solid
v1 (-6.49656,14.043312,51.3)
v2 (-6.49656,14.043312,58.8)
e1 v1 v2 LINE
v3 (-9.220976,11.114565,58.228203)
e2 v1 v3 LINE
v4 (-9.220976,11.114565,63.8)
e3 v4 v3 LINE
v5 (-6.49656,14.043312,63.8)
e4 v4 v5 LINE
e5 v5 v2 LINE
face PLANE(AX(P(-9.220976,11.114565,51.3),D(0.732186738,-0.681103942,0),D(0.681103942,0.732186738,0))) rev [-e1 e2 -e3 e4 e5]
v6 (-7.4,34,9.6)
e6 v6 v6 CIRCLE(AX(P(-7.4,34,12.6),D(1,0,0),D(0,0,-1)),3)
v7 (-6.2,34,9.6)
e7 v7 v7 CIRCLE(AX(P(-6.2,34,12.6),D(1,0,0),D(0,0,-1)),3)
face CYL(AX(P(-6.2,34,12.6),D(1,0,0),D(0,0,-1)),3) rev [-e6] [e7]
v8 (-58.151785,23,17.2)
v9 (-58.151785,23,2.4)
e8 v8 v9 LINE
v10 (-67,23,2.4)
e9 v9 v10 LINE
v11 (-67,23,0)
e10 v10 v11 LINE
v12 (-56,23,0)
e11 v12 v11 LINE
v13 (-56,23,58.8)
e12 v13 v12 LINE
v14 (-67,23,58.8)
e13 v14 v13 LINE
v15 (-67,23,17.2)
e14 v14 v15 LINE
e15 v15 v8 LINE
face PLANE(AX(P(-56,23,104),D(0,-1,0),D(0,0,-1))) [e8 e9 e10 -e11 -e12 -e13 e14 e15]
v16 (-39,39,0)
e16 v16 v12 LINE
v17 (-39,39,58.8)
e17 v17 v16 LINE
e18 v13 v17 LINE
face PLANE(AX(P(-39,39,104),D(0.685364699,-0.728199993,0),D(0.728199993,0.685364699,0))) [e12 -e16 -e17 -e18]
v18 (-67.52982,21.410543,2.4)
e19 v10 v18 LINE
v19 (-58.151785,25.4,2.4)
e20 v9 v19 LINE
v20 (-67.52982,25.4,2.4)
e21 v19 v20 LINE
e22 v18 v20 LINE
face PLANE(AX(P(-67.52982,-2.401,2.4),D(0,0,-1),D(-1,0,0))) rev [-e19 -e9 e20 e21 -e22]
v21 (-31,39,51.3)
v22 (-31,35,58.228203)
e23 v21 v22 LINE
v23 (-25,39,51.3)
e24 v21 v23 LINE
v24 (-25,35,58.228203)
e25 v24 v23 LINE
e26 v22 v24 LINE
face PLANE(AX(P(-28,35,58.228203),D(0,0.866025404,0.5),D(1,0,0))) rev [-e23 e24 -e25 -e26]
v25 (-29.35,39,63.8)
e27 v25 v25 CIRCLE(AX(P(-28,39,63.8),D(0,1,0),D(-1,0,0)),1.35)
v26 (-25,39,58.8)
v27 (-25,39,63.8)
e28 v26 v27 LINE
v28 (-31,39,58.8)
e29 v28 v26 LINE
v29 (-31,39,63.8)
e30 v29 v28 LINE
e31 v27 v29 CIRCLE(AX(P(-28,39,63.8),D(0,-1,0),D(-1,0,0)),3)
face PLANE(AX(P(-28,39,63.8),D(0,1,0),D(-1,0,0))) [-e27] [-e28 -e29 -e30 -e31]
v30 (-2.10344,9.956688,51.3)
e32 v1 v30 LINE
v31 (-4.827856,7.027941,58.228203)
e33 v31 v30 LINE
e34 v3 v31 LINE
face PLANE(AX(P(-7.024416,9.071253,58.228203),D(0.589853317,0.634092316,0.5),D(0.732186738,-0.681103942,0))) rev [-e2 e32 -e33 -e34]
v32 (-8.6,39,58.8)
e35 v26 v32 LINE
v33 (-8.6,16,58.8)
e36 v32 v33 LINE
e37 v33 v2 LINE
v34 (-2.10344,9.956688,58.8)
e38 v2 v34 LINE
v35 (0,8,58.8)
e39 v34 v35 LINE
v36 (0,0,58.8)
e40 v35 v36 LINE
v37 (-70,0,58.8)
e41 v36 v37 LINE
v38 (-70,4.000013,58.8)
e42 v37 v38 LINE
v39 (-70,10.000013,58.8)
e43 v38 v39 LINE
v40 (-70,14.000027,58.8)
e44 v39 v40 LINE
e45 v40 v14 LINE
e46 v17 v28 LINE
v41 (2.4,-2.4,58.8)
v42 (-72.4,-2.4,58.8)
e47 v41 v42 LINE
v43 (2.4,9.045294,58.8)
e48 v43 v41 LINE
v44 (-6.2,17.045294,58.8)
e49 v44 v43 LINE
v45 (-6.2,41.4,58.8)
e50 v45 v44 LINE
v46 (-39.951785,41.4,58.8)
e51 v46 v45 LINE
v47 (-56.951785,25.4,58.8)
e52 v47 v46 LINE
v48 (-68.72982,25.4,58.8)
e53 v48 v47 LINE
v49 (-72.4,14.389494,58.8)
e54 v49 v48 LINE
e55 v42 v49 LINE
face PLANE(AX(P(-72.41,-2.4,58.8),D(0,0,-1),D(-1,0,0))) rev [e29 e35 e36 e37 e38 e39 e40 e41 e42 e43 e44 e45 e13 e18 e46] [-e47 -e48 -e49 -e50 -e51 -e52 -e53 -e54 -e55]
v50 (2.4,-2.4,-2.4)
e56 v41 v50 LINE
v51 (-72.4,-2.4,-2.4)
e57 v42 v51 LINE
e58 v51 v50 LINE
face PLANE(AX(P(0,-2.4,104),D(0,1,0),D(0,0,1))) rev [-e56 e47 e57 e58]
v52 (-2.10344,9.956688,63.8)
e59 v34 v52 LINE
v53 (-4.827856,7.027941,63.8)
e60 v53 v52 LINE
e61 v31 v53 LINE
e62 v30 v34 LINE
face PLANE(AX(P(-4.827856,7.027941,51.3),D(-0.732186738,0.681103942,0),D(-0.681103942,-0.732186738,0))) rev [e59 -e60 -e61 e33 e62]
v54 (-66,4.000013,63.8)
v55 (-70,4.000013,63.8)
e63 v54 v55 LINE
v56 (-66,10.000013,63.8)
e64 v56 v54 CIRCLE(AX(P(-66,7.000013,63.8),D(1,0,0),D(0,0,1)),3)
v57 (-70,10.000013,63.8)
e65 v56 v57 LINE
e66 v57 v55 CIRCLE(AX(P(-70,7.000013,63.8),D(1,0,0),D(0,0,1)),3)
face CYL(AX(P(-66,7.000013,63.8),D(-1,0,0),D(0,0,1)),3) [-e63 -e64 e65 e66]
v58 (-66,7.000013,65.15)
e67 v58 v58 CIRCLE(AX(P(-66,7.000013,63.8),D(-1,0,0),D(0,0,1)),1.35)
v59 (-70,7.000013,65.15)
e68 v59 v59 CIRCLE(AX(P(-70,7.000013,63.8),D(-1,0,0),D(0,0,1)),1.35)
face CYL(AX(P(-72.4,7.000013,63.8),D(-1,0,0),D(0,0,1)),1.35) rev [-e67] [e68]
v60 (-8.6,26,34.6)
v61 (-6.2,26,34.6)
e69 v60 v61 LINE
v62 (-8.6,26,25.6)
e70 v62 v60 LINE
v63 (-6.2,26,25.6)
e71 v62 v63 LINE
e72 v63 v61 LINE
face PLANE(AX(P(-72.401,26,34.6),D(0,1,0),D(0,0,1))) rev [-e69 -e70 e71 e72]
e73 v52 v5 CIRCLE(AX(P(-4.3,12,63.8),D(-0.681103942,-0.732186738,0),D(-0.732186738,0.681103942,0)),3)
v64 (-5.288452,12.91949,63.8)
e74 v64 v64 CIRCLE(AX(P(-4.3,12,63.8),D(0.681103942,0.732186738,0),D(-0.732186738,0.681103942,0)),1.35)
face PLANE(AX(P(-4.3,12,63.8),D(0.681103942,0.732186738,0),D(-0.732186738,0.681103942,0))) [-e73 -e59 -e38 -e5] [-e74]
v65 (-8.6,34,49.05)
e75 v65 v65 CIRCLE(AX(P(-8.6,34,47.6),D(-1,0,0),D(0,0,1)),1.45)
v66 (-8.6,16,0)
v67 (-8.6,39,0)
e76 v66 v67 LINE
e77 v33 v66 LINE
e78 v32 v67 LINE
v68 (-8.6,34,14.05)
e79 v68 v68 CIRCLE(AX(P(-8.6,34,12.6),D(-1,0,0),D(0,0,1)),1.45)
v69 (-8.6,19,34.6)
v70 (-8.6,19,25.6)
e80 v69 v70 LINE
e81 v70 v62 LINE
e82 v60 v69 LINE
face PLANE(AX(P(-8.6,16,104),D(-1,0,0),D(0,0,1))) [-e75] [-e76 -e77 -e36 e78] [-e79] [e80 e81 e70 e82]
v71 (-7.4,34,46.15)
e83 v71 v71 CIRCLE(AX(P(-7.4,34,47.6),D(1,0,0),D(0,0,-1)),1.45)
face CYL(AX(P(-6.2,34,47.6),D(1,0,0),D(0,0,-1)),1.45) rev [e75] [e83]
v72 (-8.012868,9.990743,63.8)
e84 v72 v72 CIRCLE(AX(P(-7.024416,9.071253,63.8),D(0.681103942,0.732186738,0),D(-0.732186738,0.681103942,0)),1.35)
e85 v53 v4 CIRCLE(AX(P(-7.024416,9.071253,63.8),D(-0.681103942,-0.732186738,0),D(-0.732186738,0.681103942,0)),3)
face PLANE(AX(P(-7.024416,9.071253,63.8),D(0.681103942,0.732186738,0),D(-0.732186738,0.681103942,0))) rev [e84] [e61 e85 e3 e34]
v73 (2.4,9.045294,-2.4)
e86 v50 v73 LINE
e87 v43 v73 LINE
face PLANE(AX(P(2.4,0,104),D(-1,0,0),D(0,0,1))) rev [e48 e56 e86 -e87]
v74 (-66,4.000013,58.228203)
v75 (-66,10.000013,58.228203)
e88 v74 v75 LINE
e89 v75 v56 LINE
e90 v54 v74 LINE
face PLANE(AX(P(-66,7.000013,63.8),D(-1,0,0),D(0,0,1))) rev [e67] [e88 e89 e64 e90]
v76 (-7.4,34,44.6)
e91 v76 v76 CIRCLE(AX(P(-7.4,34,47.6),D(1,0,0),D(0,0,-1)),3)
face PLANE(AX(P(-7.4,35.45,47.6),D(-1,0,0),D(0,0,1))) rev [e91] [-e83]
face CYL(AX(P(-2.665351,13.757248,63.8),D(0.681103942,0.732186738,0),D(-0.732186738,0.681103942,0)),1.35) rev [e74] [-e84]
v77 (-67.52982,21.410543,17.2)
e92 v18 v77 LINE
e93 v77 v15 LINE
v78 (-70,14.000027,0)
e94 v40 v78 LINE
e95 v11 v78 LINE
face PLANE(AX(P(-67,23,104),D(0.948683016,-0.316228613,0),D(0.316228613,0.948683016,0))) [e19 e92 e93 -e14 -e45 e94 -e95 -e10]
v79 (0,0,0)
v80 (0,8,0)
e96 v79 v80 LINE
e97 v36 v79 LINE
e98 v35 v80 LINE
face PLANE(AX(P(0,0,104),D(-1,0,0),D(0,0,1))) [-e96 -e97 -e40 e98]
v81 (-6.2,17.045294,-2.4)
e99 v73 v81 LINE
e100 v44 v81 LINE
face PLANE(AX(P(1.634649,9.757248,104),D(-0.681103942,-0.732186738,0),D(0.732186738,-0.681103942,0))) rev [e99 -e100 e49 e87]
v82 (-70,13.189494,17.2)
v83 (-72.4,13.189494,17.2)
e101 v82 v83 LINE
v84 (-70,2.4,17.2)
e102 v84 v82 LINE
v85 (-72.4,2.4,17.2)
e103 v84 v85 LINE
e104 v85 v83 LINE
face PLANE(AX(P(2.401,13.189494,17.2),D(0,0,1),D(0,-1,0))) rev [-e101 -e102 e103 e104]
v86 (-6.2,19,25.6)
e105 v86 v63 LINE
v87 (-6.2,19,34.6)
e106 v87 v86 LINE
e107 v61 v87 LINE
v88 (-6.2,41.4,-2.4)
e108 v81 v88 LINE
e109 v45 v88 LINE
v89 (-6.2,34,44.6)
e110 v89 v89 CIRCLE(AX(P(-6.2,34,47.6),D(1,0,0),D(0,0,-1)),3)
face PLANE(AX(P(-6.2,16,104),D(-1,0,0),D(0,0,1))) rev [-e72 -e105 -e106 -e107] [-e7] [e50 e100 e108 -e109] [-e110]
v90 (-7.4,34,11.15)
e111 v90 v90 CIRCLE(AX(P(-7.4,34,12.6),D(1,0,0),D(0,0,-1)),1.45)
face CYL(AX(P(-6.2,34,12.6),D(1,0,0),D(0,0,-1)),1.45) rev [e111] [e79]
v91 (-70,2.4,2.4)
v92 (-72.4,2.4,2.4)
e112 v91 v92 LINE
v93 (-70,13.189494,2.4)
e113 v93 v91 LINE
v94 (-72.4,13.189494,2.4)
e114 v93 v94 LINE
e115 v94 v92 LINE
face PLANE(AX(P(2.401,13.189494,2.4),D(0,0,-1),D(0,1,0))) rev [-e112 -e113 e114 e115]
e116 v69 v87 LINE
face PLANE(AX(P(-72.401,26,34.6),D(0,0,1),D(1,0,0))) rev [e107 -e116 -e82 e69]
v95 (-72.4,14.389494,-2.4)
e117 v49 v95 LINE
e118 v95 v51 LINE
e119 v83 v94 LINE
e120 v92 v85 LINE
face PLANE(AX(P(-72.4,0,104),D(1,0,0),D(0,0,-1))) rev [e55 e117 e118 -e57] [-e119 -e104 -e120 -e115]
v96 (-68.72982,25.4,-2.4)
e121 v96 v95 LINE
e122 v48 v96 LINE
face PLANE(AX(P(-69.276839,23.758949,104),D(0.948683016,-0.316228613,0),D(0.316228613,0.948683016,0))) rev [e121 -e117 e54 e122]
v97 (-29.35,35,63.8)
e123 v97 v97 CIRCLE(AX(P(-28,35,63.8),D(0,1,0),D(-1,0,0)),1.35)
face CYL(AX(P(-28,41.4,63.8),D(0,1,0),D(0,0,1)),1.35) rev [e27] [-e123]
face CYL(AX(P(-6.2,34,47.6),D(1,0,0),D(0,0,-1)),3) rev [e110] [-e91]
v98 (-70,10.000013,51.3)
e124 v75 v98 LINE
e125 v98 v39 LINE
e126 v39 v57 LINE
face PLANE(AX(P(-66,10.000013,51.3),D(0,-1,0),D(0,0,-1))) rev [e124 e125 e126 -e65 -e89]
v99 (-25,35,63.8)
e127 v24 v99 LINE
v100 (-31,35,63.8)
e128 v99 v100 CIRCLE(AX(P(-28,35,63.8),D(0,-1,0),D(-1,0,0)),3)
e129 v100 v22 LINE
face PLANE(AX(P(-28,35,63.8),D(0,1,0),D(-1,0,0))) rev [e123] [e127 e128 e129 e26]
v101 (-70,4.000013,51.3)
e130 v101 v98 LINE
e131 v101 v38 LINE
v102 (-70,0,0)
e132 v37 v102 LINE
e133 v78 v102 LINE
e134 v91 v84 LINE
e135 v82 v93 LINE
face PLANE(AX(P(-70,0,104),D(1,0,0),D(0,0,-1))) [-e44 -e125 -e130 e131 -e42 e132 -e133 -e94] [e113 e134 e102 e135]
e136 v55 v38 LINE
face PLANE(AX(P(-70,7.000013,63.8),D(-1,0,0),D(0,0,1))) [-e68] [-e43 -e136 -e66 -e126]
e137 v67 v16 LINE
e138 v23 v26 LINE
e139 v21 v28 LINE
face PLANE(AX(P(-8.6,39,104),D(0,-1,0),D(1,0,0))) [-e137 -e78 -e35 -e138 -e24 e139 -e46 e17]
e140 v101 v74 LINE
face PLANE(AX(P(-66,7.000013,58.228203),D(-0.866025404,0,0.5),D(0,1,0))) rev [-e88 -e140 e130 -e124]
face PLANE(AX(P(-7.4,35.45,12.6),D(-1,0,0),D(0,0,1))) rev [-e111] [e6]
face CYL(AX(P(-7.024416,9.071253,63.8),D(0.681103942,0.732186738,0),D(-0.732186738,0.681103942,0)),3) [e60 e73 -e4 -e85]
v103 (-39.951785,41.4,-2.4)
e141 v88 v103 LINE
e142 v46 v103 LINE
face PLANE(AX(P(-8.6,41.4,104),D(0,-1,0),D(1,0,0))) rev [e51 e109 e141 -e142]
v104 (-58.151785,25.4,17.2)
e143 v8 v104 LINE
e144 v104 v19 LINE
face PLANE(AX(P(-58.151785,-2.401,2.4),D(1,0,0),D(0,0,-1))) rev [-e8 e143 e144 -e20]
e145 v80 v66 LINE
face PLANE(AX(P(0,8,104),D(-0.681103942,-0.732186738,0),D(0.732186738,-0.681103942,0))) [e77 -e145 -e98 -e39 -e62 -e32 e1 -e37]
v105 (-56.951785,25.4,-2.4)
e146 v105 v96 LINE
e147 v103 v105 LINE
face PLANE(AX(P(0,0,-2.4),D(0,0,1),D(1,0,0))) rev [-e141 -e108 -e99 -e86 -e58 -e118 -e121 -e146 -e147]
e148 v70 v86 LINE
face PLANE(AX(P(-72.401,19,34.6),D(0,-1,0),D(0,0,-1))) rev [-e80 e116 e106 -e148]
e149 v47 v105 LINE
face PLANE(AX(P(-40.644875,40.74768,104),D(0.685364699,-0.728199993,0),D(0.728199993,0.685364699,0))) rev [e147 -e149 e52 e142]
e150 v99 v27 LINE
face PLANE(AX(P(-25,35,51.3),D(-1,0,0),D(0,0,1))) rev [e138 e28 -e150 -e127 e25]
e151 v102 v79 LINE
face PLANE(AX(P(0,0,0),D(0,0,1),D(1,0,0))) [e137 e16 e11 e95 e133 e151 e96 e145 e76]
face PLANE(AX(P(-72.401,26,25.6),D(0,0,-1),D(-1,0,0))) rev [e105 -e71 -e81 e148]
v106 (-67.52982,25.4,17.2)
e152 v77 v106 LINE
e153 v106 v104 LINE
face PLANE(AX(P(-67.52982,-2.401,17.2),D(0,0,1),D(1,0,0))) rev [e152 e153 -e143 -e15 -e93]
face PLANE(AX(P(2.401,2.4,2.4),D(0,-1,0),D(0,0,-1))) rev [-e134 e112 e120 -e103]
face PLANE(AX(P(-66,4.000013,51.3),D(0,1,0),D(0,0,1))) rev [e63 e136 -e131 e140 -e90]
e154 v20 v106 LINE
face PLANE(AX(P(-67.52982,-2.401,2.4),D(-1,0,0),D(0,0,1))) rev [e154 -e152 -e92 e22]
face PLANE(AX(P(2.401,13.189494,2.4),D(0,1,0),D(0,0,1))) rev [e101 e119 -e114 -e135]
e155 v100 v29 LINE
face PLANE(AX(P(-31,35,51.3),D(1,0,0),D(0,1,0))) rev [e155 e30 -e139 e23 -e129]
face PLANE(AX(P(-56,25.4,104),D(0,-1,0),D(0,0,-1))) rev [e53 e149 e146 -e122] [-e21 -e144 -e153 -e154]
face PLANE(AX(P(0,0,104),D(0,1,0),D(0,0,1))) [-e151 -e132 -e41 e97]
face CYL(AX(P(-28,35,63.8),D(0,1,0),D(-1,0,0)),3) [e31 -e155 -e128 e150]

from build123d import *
from OCP.BRepFilletAPI import BRepFilletAPI_MakeChamfer

# Parameters (mm, degrees)
BOSS_EXTRUDE1_DEPTH                                = 104
SHELL1_START                                       = -8.6
SHELL1_OUTLINE_W                                   = 16
SHELL1_OUTLINE_H                                   = 108.8
SHELL1_DEPTH                                       = 2.4
SHELL1_START_2                                     = -56.951785259
SHELL1_2_OUTLINE_W                                 = 43.8
SHELL1_2_OUTLINE_H                                 = 108.8
SHELL1_2_DEPTH                                     = 50.751785259
SHELL1_START_3                                     = -72.4
SHELL1_3_OUTLINE_W                                 = 27.8
SHELL1_3_OUTLINE_H                                 = 108.8
SHELL1_3_DEPTH                                     = 74.8
SHELL1_4_DEPTH                                     = 104
SHELL1_START_4                                     = -2.4
SHELL1_5_DEPTH                                     = 108.8
SPLIT1_SURFACE_1_BACK                              = 140.108
SPLIT1_SURFACE_1_DEPTH                             = 280.216
SPLIT1_SURFACE_2_BACK                              = 140.108
SPLIT1_SURFACE_2_DEPTH                             = 280.216
BOSS_EXTRUDE2_DEPTH                                = 4
BOSS_EXTRUDE3_DEPTH                                = 4
BOSS_EXTRUDE4_DEPTH                                = 4
CHAMFER1_SIZE                                      = 4
CHAMFER1_SIZE_2                                    = 6.92820323
CBORE_START                                        = 6.157493905
CBORE_FOR_M2_5_PAN_HEAD_MACHINE_SCRE_2_R           = 3
CBORE_FOR_M2_5_PAN_HEAD_MACHINE_SCREW1_4_DEPTH     = 2.1
CBORE_START_2                                      = 5.857493905
CBORE_FOR_M2_5_PAN_HEAD_MACHINE_SCRE_3_R           = 1.35
CBORE_FOR_M2_5_PAN_HEAD_MACHINE_SCREW1_5_DEPTH     = 0.3
CBORE_START_3                                      = 39.3
CBORE_FOR_M2_5_PAN_HEAD_MACHINE_SCRE_4_R           = 3
CBORE_FOR_M2_5_PAN_HEAD_MACHINE_SCREW1_6_DEPTH     = 2.1
CBORE_START_4                                      = 38
CBORE_FOR_M2_5_PAN_HEAD_MACHINE_SCRE_5_R           = 1.35
CBORE_FOR_M2_5_PAN_HEAD_MACHINE_SCREW1_7_DEPTH     = 1.3
CBORE_START_5                                      = -72.4
CBORE_FOR_M2_5_PAN_HEAD_MACHINE_SCRE_6_R           = 3
CBORE_FOR_M2_5_PAN_HEAD_MACHINE_SCREW1_8_DEPTH     = 2.1
CBORE_START_6                                      = -70.3
CBORE_FOR_M2_5_PAN_HEAD_MACHINE_SCRE_7_R           = 1.35
CBORE_FOR_M2_5_PAN_HEAD_MACHINE_SCREW1_9_DEPTH     = 0.3
CUT_EXTRUDE1_REACH                                 = 104.356
SKETCH12_W                                         = 9.37803524
SKETCH12_H                                         = 14.8
CUT_EXTRUDE2_REACH                                 = 110.495
SKETCH13_W                                         = 14.8
SKETCH13_H                                         = 10.789494281
CUT_EXTRUDE3_REACH                                 = 104.755
SKETCH14_W                                         = 9
SKETCH14_H                                         = 7
CBORE_FOR_M2_5_PAN_HEAD_MACHINE_SCREW2_D           = 2.9
CBORE_FOR_M2_5_PAN_HEAD_MACHINE_SCREW2_DEPTH       = 10
CBORE_FOR_M2_5_PAN_HEAD_MACHINE_SCREW2_CBORE_D     = 6
CBORE_FOR_M2_5_PAN_HEAD_MACHINE_SCREW2_CBORE_DEPTH = 1.2


with BuildPart() as part:
    # Sketch1 → Boss-Extrude1 (new body)
    with BuildSketch(Plane.XY):
        Polygon((-39, 39), (-56, 23), (-67, 23), (-70, 14.000026796), (-70, 0), (0, 0), (0, 8), (-8.6, 16), (-8.6, 39), align=None)
    extrude(amount=BOSS_EXTRUDE1_DEPTH)

    # Shell1: read off the stored shape, not the designer's step
    # Shell1 outline → Shell1 (add)
    with BuildSketch(Plane.YZ.offset(SHELL1_START)):
        with Locations((33.4, 52)):
            Rectangle(SHELL1_OUTLINE_W, SHELL1_OUTLINE_H)
    extrude(amount=SHELL1_DEPTH)

    # Shell1 2 outline → Shell1 2 (add)
    with BuildSketch(Plane.YZ.offset(SHELL1_START_2)):
        with Locations((19.5, 52)):
            Rectangle(SHELL1_2_OUTLINE_W, SHELL1_2_OUTLINE_H)
    extrude(amount=SHELL1_2_DEPTH)

    # Shell1 3 outline → Shell1 3 (add)
    with BuildSketch(Plane.YZ.offset(SHELL1_START_3)):
        with Locations((11.5, 52)):
            Rectangle(SHELL1_3_OUTLINE_W, SHELL1_3_OUTLINE_H)
    extrude(amount=SHELL1_3_DEPTH)

    # Shell1 4 outline → Shell1 4 (cut)
    with BuildSketch(Plane.XY):
        Polygon((-6.2, 25.4), (-6.2, 17.045294183), (2.4, 9.045294183), (2.4, 25.4), align=None)
        Polygon((-72.4, 14.389494281), (-68.729820499, 25.4), (-72.4, 25.4), align=None)
        Polygon((-56.951785259, 25.4), (-39.951785259, 41.4), (-56.951785259, 41.4), align=None)
        Polygon((0, 0), (0, 8), (-8.6, 16), (-8.6, 39), (-39, 39), (-56, 23), (-67, 23), (-70, 14.000026796), (-70, 0), align=None)
    extrude(amount=SHELL1_4_DEPTH, mode=Mode.SUBTRACT)

    # Shell1 5 outline → Shell1 5 (cut)
    with BuildSketch(Plane.XY.offset(SHELL1_START_4)):
        Polygon((-6.2, 25.4), (-6.2, 17.045294183), (2.4, 9.045294183), (2.4, 25.4), align=None)
        Polygon((-72.4, 14.389494281), (-68.729820499, 25.4), (-72.4, 25.4), align=None)
        Polygon((-56.951785259, 25.4), (-39.951785259, 41.4), (-56.951785259, 41.4), align=None)
    extrude(amount=SHELL1_5_DEPTH, mode=Mode.SUBTRACT)


with BuildPart() as body_2:
    # Split1: the piece behind the surface
    add(part.part)
    # Split1 surface: a surface, the sketch's curves swept straight by 280.216 mm
    with BuildLine(Plane(origin=(0, 0, 0), x_dir=(0, 0, -1), z_dir=(1, 0, 0)).offset(-SPLIT1_SURFACE_1_BACK), mode=Mode.PRIVATE) as split1_surface_1_path:
        Line((-58.8, -2.4), (-58.8, 41.4))
    split1_surface_1 = Shell.extrude(split1_surface_1_path.wire(), (1 * SPLIT1_SURFACE_1_DEPTH, 0 * SPLIT1_SURFACE_1_DEPTH, 0 * SPLIT1_SURFACE_1_DEPTH))
    split(bisect_by=split1_surface_1, keep=Keep.BOTTOM)

    # Sketch3 → Boss-Extrude2 (add)
    with BuildSketch(Plane(origin=(3.989562192, 4.288779356, 0), x_dir=(0.7321867381630838, -0.6811039424772873, 0), z_dir=(-0.6811039424772873, -0.7321867381630838, 0))):
        with BuildLine():
            Line((-14.321650284, 51.3), (-8.321650284, 51.3))
            Line((-8.321650284, 51.3), (-8.321650284, 63.8))
            ThreePointArc((-8.321650284, 63.8), (-11.321650284, 66.8), (-14.321650284, 63.8))
            Line((-14.321650284, 63.8), (-14.321650284, 51.3))
        make_face()
    extrude(amount=BOSS_EXTRUDE2_DEPTH)

    # Sketch4 → Boss-Extrude3 (add)
    with BuildSketch(Plane.XZ.offset(-39)):
        with BuildLine():
            Line((-31, 51.3), (-25, 51.3))
            Line((-25, 51.3), (-25, 63.8))
            ThreePointArc((-25, 63.8), (-28, 66.8), (-31, 63.8))
            Line((-31, 63.8), (-31, 51.3))
        make_face()
    extrude(amount=BOSS_EXTRUDE3_DEPTH)

    # Sketch5 → Boss-Extrude4 (add)
    with BuildSketch(Plane(origin=(-70, 0, 0), x_dir=(0, 0, -1), z_dir=(1, 0, 0))):
        with BuildLine():
            Line((-51.3, 10.000013398), (-63.8, 10.000013398))
            ThreePointArc((-63.8, 10.000013398), (-66.8, 7.000013398), (-63.8, 4.000013398))
            Line((-63.8, 4.000013398), (-51.3, 4.000013398))
            Line((-51.3, 4.000013398), (-51.3, 10.000013398))
        make_face()
    extrude(amount=BOSS_EXTRUDE4_DEPTH)

    # Chamfer1
    chamfer1_edges_1 = [body_2.edges().sort_by_distance(p)[0] for p in [
        (-7.02441577, 9.071253047, 51.3),
    ]]
    chamfer1_side_1 = [body_2.faces().sort_by_distance(p)[0] for p in [
        (-6.969927455, 9.129827986, 51.3),
    ]]
    chamfer1_edges_2 = [body_2.edges().sort_by_distance(p)[0] for p in [
        (-28, 35, 51.3),
    ]]
    chamfer1_side_2 = [body_2.faces().sort_by_distance(p)[0] for p in [
        (-28, 35.08, 51.3),
    ]]
    chamfer1_edges_3 = [body_2.edges().sort_by_distance(p)[0] for p in [
        (-66, 7.000013398, 51.3),
    ]]
    chamfer1_side_3 = [body_2.faces().sort_by_distance(p)[0] for p in [
        (-66.08, 7.000013398, 51.3),
    ]]
    chamfer1 = BRepFilletAPI_MakeChamfer(body_2.part.solid().wrapped)
    for e in chamfer1_edges_1:
        chamfer1.Add(CHAMFER1_SIZE - 0.0001, CHAMFER1_SIZE_2 - 0.0001, e.wrapped, chamfer1_side_1[0].wrapped)
    for e in chamfer1_edges_2:
        chamfer1.Add(CHAMFER1_SIZE - 0.0001, CHAMFER1_SIZE_2 - 0.0001, e.wrapped, chamfer1_side_2[0].wrapped)
    for e in chamfer1_edges_3:
        chamfer1.Add(CHAMFER1_SIZE - 0.0001, CHAMFER1_SIZE_2 - 0.0001, e.wrapped, chamfer1_side_3[0].wrapped)
    add(Compound.cast(chamfer1.Shape()), mode=Mode.REPLACE)  # a hair under: the kernel refuses the full size

    # CBORE for M2.5 Pan Head Machine Screw1: read off the stored shape, not the designer's step
    # CBORE for M2.5 Pan Head Machine Screw1: loft between two sections, ruled curve by curve
    cbore_for_m2_5_pan_head_machine_screw1_from = [
        Edge.make_three_point_arc((-8.012867866, 9.99074337, 63.8), (-7.02441577, 9.071253047, 65.15), (-6.035963673, 8.151762725, 63.8)),
        Edge.make_three_point_arc((-6.035963673, 8.151762725, 63.8), (-7.02441577, 9.071253047, 62.45), (-8.012867866, 9.99074337, 63.8)),
    ]
    cbore_for_m2_5_pan_head_machine_screw1_to = [
        Edge.make_three_point_arc((-5.288452097, 12.919490322, 63.8), (-4.3, 12, 65.15), (-3.311547903, 11.080509678, 63.8)),
        Edge.make_three_point_arc((-3.311547903, 11.080509678, 63.8), (-4.3, 12, 62.45), (-5.288452097, 12.919490322, 63.8)),
    ]
    cbore_for_m2_5_pan_head_machine_screw1 = Solid(Shell([*[Face.make_surface_from_curves(cbore_for_m2_5_pan_head_machine_screw1_from[k], cbore_for_m2_5_pan_head_machine_screw1_to[k]) for k in range(2)], Face(Wire(cbore_for_m2_5_pan_head_machine_screw1_from)), Face(Wire(cbore_for_m2_5_pan_head_machine_screw1_to))]))
    add(cbore_for_m2_5_pan_head_machine_screw1, mode=Mode.SUBTRACT)

    # CBORE for M2.5 Pan Head Machine Screw1 2: loft between two sections, ruled curve by curve
    cbore_for_m2_5_pan_head_machine_screw1_2_from = [
        Edge.make_three_point_arc((-29.35, 35, 63.8), (-28, 35, 65.15), (-26.65, 35, 63.8)),
        Edge.make_three_point_arc((-26.65, 35, 63.8), (-28, 35, 62.45), (-29.35, 35, 63.8)),
    ]
    cbore_for_m2_5_pan_head_machine_screw1_2_to = [
        Edge.make_three_point_arc((-29.35, 39, 63.8), (-28, 39, 65.15), (-26.65, 39, 63.8)),
        Edge.make_three_point_arc((-26.65, 39, 63.8), (-28, 39, 62.45), (-29.35, 39, 63.8)),
    ]
    cbore_for_m2_5_pan_head_machine_screw1_2 = Solid(Shell([*[Face.make_surface_from_curves(cbore_for_m2_5_pan_head_machine_screw1_2_from[k], cbore_for_m2_5_pan_head_machine_screw1_2_to[k]) for k in range(2)], Face(Wire(cbore_for_m2_5_pan_head_machine_screw1_2_from)), Face(Wire(cbore_for_m2_5_pan_head_machine_screw1_2_to))]))
    add(cbore_for_m2_5_pan_head_machine_screw1_2, mode=Mode.SUBTRACT)

    # CBORE for M2.5 Pan Head Machine Screw1 3: loft between two sections, ruled curve by curve
    cbore_for_m2_5_pan_head_machine_screw1_3_from = [
        Edge.make_three_point_arc((-66, 7.000013398, 65.15), (-66, 8.350013398, 63.8), (-66, 7.000013398, 62.45)),
        Edge.make_three_point_arc((-66, 7.000013398, 62.45), (-66, 5.650013398, 63.8), (-66, 7.000013398, 65.15)),
    ]
    cbore_for_m2_5_pan_head_machine_screw1_3_to = [
        Edge.make_three_point_arc((-70, 7.000013398, 65.15), (-70, 8.350013398, 63.8), (-70, 7.000013398, 62.45)),
        Edge.make_three_point_arc((-70, 7.000013398, 62.45), (-70, 5.650013398, 63.8), (-70, 7.000013398, 65.15)),
    ]
    cbore_for_m2_5_pan_head_machine_screw1_3 = Solid(Shell([*[Face.make_surface_from_curves(cbore_for_m2_5_pan_head_machine_screw1_3_from[k], cbore_for_m2_5_pan_head_machine_screw1_3_to[k]) for k in range(2)], Face(Wire(cbore_for_m2_5_pan_head_machine_screw1_3_from)), Face(Wire(cbore_for_m2_5_pan_head_machine_screw1_3_to))]))
    add(cbore_for_m2_5_pan_head_machine_screw1_3, mode=Mode.SUBTRACT)

    # Sketch12 → Cut-Extrude1 (cut, up to next)
    with BuildSketch(Plane(origin=(0, 25.4, 0), x_dir=(1, 0, 0), z_dir=(0, 1, 0)), mode=Mode.PRIVATE) as cut_extrude1_sk1:
        with Locations((-62.840802879, -9.8)):
            Rectangle(SKETCH12_W, SKETCH12_H)
    cut_extrude1_tool1 = extrude(cut_extrude1_sk1.sketch, amount=-CUT_EXTRUDE1_REACH, mode=Mode.PRIVATE) & body_2.part
    add(cut_extrude1_tool1.solids().sort_by_distance((-62.840803, 25.4, 9.8))[0], mode=Mode.SUBTRACT)

    # Sketch13 → Cut-Extrude2 (cut, up to next)
    with BuildSketch(Plane.ZY.offset(72.4), mode=Mode.PRIVATE) as cut_extrude2_sk1:
        with Locations((9.8, 7.794747141)):
            Rectangle(SKETCH13_W, SKETCH13_H)
    cut_extrude2_tool1 = extrude(cut_extrude2_sk1.sketch, amount=-CUT_EXTRUDE2_REACH, mode=Mode.PRIVATE) & body_2.part
    add(cut_extrude2_tool1.solids().sort_by_distance((-72.4, 7.794747, 9.8))[0], mode=Mode.SUBTRACT)

    # Sketch14 → Cut-Extrude3 (cut, up to next)
    with BuildSketch(Plane(origin=(-6.2, 0, 0), x_dir=(0, 0, -1), z_dir=(1, 0, 0)), mode=Mode.PRIVATE) as cut_extrude3_sk1:
        with Locations((-30.1, 22.5)):
            Rectangle(SKETCH14_W, SKETCH14_H)
    cut_extrude3_tool1 = extrude(cut_extrude3_sk1.sketch, amount=-CUT_EXTRUDE3_REACH, mode=Mode.PRIVATE) & body_2.part
    add(cut_extrude3_tool1.solids().sort_by_distance((-6.2, 22.5, 30.1))[0], mode=Mode.SUBTRACT)

    # CBORE for M2.5 Pan Head Machine Screw2
    with Locations(Plane(origin=(-6.2, 0, 0), x_dir=(0, 0, -1), z_dir=(1, 0, 0))):
        with Locations((-47.6, 34), (-12.6, 34)):
            CounterBoreHole(CBORE_FOR_M2_5_PAN_HEAD_MACHINE_SCREW2_D / 2, CBORE_FOR_M2_5_PAN_HEAD_MACHINE_SCREW2_CBORE_D / 2, CBORE_FOR_M2_5_PAN_HEAD_MACHINE_SCREW2_CBORE_DEPTH, depth=CBORE_FOR_M2_5_PAN_HEAD_MACHINE_SCREW2_DEPTH)


with BuildPart() as part_1:
    add(part.part)

    # Split1: split by a surface, the side it looks to stays
    # Split1 surface: a surface, the sketch's curves swept straight by 280.216 mm
    with BuildLine(Plane(origin=(0, 0, 0), x_dir=(0, 0, -1), z_dir=(1, 0, 0)).offset(-SPLIT1_SURFACE_2_BACK), mode=Mode.PRIVATE) as split1_surface_2_path:
        Line((-58.8, -2.4), (-58.8, 41.4))
    split1_surface_2 = Shell.extrude(split1_surface_2_path.wire(), (1 * SPLIT1_SURFACE_2_DEPTH, 0 * SPLIT1_SURFACE_2_DEPTH, 0 * SPLIT1_SURFACE_2_DEPTH))
    split(bisect_by=split1_surface_2, keep=Keep.TOP)

    # CBORE for M2.5 Pan Head Machine Scre 2 → CBORE for M2.5 Pan Head Machine Screw1 4 (cut)
    with BuildSketch(Plane(origin=(0, 0, 0), x_dir=(0.732186738163084, -0.681103942477287, 0), z_dir=(0.681103942477287, 0.732186738163084, 0)).offset(CBORE_START)):
        with Locations((-11.321650284, -63.8)):
            Circle(CBORE_FOR_M2_5_PAN_HEAD_MACHINE_SCRE_2_R)
    extrude(amount=CBORE_FOR_M2_5_PAN_HEAD_MACHINE_SCREW1_4_DEPTH, mode=Mode.SUBTRACT)

    # CBORE for M2.5 Pan Head Machine Scre 3 → CBORE for M2.5 Pan Head Machine Screw1 5 (cut)
    with BuildSketch(Plane(origin=(0, 0, 0), x_dir=(0.732186738163084, -0.681103942477287, 0), z_dir=(0.681103942477287, 0.732186738163084, 0)).offset(CBORE_START_2)):
        with Locations((-11.321650284, -63.8)):
            Circle(CBORE_FOR_M2_5_PAN_HEAD_MACHINE_SCRE_3_R)
    extrude(amount=CBORE_FOR_M2_5_PAN_HEAD_MACHINE_SCREW1_5_DEPTH, mode=Mode.SUBTRACT)

    # CBORE for M2.5 Pan Head Machine Scre 4 → CBORE for M2.5 Pan Head Machine Screw1 6 (cut)
    with BuildSketch(Plane(origin=(0, 0, 0), x_dir=(1, 0, 0), z_dir=(0, 1, 0)).offset(CBORE_START_3)):
        with Locations((-28, -63.8)):
            Circle(CBORE_FOR_M2_5_PAN_HEAD_MACHINE_SCRE_4_R)
    extrude(amount=CBORE_FOR_M2_5_PAN_HEAD_MACHINE_SCREW1_6_DEPTH, mode=Mode.SUBTRACT)

    # CBORE for M2.5 Pan Head Machine Scre 5 → CBORE for M2.5 Pan Head Machine Screw1 7 (cut)
    with BuildSketch(Plane(origin=(0, 0, 0), x_dir=(1, 0, 0), z_dir=(0, 1, 0)).offset(CBORE_START_4)):
        with Locations((-28, -63.8)):
            Circle(CBORE_FOR_M2_5_PAN_HEAD_MACHINE_SCRE_5_R)
    extrude(amount=CBORE_FOR_M2_5_PAN_HEAD_MACHINE_SCREW1_7_DEPTH, mode=Mode.SUBTRACT)

    # CBORE for M2.5 Pan Head Machine Scre 6 → CBORE for M2.5 Pan Head Machine Screw1 8 (cut)
    with BuildSketch(Plane.YZ.offset(CBORE_START_5)):
        with Locations((7.000013398, 63.8)):
            Circle(CBORE_FOR_M2_5_PAN_HEAD_MACHINE_SCRE_6_R)
    extrude(amount=CBORE_FOR_M2_5_PAN_HEAD_MACHINE_SCREW1_8_DEPTH, mode=Mode.SUBTRACT)

    # CBORE for M2.5 Pan Head Machine Scre 7 → CBORE for M2.5 Pan Head Machine Screw1 9 (cut)
    with BuildSketch(Plane.YZ.offset(CBORE_START_6)):
        with Locations((7.000013398, 63.8)):
            Circle(CBORE_FOR_M2_5_PAN_HEAD_MACHINE_SCRE_7_R)
    extrude(amount=CBORE_FOR_M2_5_PAN_HEAD_MACHINE_SCREW1_9_DEPTH, mode=Mode.SUBTRACT)


solid = body_2.part
